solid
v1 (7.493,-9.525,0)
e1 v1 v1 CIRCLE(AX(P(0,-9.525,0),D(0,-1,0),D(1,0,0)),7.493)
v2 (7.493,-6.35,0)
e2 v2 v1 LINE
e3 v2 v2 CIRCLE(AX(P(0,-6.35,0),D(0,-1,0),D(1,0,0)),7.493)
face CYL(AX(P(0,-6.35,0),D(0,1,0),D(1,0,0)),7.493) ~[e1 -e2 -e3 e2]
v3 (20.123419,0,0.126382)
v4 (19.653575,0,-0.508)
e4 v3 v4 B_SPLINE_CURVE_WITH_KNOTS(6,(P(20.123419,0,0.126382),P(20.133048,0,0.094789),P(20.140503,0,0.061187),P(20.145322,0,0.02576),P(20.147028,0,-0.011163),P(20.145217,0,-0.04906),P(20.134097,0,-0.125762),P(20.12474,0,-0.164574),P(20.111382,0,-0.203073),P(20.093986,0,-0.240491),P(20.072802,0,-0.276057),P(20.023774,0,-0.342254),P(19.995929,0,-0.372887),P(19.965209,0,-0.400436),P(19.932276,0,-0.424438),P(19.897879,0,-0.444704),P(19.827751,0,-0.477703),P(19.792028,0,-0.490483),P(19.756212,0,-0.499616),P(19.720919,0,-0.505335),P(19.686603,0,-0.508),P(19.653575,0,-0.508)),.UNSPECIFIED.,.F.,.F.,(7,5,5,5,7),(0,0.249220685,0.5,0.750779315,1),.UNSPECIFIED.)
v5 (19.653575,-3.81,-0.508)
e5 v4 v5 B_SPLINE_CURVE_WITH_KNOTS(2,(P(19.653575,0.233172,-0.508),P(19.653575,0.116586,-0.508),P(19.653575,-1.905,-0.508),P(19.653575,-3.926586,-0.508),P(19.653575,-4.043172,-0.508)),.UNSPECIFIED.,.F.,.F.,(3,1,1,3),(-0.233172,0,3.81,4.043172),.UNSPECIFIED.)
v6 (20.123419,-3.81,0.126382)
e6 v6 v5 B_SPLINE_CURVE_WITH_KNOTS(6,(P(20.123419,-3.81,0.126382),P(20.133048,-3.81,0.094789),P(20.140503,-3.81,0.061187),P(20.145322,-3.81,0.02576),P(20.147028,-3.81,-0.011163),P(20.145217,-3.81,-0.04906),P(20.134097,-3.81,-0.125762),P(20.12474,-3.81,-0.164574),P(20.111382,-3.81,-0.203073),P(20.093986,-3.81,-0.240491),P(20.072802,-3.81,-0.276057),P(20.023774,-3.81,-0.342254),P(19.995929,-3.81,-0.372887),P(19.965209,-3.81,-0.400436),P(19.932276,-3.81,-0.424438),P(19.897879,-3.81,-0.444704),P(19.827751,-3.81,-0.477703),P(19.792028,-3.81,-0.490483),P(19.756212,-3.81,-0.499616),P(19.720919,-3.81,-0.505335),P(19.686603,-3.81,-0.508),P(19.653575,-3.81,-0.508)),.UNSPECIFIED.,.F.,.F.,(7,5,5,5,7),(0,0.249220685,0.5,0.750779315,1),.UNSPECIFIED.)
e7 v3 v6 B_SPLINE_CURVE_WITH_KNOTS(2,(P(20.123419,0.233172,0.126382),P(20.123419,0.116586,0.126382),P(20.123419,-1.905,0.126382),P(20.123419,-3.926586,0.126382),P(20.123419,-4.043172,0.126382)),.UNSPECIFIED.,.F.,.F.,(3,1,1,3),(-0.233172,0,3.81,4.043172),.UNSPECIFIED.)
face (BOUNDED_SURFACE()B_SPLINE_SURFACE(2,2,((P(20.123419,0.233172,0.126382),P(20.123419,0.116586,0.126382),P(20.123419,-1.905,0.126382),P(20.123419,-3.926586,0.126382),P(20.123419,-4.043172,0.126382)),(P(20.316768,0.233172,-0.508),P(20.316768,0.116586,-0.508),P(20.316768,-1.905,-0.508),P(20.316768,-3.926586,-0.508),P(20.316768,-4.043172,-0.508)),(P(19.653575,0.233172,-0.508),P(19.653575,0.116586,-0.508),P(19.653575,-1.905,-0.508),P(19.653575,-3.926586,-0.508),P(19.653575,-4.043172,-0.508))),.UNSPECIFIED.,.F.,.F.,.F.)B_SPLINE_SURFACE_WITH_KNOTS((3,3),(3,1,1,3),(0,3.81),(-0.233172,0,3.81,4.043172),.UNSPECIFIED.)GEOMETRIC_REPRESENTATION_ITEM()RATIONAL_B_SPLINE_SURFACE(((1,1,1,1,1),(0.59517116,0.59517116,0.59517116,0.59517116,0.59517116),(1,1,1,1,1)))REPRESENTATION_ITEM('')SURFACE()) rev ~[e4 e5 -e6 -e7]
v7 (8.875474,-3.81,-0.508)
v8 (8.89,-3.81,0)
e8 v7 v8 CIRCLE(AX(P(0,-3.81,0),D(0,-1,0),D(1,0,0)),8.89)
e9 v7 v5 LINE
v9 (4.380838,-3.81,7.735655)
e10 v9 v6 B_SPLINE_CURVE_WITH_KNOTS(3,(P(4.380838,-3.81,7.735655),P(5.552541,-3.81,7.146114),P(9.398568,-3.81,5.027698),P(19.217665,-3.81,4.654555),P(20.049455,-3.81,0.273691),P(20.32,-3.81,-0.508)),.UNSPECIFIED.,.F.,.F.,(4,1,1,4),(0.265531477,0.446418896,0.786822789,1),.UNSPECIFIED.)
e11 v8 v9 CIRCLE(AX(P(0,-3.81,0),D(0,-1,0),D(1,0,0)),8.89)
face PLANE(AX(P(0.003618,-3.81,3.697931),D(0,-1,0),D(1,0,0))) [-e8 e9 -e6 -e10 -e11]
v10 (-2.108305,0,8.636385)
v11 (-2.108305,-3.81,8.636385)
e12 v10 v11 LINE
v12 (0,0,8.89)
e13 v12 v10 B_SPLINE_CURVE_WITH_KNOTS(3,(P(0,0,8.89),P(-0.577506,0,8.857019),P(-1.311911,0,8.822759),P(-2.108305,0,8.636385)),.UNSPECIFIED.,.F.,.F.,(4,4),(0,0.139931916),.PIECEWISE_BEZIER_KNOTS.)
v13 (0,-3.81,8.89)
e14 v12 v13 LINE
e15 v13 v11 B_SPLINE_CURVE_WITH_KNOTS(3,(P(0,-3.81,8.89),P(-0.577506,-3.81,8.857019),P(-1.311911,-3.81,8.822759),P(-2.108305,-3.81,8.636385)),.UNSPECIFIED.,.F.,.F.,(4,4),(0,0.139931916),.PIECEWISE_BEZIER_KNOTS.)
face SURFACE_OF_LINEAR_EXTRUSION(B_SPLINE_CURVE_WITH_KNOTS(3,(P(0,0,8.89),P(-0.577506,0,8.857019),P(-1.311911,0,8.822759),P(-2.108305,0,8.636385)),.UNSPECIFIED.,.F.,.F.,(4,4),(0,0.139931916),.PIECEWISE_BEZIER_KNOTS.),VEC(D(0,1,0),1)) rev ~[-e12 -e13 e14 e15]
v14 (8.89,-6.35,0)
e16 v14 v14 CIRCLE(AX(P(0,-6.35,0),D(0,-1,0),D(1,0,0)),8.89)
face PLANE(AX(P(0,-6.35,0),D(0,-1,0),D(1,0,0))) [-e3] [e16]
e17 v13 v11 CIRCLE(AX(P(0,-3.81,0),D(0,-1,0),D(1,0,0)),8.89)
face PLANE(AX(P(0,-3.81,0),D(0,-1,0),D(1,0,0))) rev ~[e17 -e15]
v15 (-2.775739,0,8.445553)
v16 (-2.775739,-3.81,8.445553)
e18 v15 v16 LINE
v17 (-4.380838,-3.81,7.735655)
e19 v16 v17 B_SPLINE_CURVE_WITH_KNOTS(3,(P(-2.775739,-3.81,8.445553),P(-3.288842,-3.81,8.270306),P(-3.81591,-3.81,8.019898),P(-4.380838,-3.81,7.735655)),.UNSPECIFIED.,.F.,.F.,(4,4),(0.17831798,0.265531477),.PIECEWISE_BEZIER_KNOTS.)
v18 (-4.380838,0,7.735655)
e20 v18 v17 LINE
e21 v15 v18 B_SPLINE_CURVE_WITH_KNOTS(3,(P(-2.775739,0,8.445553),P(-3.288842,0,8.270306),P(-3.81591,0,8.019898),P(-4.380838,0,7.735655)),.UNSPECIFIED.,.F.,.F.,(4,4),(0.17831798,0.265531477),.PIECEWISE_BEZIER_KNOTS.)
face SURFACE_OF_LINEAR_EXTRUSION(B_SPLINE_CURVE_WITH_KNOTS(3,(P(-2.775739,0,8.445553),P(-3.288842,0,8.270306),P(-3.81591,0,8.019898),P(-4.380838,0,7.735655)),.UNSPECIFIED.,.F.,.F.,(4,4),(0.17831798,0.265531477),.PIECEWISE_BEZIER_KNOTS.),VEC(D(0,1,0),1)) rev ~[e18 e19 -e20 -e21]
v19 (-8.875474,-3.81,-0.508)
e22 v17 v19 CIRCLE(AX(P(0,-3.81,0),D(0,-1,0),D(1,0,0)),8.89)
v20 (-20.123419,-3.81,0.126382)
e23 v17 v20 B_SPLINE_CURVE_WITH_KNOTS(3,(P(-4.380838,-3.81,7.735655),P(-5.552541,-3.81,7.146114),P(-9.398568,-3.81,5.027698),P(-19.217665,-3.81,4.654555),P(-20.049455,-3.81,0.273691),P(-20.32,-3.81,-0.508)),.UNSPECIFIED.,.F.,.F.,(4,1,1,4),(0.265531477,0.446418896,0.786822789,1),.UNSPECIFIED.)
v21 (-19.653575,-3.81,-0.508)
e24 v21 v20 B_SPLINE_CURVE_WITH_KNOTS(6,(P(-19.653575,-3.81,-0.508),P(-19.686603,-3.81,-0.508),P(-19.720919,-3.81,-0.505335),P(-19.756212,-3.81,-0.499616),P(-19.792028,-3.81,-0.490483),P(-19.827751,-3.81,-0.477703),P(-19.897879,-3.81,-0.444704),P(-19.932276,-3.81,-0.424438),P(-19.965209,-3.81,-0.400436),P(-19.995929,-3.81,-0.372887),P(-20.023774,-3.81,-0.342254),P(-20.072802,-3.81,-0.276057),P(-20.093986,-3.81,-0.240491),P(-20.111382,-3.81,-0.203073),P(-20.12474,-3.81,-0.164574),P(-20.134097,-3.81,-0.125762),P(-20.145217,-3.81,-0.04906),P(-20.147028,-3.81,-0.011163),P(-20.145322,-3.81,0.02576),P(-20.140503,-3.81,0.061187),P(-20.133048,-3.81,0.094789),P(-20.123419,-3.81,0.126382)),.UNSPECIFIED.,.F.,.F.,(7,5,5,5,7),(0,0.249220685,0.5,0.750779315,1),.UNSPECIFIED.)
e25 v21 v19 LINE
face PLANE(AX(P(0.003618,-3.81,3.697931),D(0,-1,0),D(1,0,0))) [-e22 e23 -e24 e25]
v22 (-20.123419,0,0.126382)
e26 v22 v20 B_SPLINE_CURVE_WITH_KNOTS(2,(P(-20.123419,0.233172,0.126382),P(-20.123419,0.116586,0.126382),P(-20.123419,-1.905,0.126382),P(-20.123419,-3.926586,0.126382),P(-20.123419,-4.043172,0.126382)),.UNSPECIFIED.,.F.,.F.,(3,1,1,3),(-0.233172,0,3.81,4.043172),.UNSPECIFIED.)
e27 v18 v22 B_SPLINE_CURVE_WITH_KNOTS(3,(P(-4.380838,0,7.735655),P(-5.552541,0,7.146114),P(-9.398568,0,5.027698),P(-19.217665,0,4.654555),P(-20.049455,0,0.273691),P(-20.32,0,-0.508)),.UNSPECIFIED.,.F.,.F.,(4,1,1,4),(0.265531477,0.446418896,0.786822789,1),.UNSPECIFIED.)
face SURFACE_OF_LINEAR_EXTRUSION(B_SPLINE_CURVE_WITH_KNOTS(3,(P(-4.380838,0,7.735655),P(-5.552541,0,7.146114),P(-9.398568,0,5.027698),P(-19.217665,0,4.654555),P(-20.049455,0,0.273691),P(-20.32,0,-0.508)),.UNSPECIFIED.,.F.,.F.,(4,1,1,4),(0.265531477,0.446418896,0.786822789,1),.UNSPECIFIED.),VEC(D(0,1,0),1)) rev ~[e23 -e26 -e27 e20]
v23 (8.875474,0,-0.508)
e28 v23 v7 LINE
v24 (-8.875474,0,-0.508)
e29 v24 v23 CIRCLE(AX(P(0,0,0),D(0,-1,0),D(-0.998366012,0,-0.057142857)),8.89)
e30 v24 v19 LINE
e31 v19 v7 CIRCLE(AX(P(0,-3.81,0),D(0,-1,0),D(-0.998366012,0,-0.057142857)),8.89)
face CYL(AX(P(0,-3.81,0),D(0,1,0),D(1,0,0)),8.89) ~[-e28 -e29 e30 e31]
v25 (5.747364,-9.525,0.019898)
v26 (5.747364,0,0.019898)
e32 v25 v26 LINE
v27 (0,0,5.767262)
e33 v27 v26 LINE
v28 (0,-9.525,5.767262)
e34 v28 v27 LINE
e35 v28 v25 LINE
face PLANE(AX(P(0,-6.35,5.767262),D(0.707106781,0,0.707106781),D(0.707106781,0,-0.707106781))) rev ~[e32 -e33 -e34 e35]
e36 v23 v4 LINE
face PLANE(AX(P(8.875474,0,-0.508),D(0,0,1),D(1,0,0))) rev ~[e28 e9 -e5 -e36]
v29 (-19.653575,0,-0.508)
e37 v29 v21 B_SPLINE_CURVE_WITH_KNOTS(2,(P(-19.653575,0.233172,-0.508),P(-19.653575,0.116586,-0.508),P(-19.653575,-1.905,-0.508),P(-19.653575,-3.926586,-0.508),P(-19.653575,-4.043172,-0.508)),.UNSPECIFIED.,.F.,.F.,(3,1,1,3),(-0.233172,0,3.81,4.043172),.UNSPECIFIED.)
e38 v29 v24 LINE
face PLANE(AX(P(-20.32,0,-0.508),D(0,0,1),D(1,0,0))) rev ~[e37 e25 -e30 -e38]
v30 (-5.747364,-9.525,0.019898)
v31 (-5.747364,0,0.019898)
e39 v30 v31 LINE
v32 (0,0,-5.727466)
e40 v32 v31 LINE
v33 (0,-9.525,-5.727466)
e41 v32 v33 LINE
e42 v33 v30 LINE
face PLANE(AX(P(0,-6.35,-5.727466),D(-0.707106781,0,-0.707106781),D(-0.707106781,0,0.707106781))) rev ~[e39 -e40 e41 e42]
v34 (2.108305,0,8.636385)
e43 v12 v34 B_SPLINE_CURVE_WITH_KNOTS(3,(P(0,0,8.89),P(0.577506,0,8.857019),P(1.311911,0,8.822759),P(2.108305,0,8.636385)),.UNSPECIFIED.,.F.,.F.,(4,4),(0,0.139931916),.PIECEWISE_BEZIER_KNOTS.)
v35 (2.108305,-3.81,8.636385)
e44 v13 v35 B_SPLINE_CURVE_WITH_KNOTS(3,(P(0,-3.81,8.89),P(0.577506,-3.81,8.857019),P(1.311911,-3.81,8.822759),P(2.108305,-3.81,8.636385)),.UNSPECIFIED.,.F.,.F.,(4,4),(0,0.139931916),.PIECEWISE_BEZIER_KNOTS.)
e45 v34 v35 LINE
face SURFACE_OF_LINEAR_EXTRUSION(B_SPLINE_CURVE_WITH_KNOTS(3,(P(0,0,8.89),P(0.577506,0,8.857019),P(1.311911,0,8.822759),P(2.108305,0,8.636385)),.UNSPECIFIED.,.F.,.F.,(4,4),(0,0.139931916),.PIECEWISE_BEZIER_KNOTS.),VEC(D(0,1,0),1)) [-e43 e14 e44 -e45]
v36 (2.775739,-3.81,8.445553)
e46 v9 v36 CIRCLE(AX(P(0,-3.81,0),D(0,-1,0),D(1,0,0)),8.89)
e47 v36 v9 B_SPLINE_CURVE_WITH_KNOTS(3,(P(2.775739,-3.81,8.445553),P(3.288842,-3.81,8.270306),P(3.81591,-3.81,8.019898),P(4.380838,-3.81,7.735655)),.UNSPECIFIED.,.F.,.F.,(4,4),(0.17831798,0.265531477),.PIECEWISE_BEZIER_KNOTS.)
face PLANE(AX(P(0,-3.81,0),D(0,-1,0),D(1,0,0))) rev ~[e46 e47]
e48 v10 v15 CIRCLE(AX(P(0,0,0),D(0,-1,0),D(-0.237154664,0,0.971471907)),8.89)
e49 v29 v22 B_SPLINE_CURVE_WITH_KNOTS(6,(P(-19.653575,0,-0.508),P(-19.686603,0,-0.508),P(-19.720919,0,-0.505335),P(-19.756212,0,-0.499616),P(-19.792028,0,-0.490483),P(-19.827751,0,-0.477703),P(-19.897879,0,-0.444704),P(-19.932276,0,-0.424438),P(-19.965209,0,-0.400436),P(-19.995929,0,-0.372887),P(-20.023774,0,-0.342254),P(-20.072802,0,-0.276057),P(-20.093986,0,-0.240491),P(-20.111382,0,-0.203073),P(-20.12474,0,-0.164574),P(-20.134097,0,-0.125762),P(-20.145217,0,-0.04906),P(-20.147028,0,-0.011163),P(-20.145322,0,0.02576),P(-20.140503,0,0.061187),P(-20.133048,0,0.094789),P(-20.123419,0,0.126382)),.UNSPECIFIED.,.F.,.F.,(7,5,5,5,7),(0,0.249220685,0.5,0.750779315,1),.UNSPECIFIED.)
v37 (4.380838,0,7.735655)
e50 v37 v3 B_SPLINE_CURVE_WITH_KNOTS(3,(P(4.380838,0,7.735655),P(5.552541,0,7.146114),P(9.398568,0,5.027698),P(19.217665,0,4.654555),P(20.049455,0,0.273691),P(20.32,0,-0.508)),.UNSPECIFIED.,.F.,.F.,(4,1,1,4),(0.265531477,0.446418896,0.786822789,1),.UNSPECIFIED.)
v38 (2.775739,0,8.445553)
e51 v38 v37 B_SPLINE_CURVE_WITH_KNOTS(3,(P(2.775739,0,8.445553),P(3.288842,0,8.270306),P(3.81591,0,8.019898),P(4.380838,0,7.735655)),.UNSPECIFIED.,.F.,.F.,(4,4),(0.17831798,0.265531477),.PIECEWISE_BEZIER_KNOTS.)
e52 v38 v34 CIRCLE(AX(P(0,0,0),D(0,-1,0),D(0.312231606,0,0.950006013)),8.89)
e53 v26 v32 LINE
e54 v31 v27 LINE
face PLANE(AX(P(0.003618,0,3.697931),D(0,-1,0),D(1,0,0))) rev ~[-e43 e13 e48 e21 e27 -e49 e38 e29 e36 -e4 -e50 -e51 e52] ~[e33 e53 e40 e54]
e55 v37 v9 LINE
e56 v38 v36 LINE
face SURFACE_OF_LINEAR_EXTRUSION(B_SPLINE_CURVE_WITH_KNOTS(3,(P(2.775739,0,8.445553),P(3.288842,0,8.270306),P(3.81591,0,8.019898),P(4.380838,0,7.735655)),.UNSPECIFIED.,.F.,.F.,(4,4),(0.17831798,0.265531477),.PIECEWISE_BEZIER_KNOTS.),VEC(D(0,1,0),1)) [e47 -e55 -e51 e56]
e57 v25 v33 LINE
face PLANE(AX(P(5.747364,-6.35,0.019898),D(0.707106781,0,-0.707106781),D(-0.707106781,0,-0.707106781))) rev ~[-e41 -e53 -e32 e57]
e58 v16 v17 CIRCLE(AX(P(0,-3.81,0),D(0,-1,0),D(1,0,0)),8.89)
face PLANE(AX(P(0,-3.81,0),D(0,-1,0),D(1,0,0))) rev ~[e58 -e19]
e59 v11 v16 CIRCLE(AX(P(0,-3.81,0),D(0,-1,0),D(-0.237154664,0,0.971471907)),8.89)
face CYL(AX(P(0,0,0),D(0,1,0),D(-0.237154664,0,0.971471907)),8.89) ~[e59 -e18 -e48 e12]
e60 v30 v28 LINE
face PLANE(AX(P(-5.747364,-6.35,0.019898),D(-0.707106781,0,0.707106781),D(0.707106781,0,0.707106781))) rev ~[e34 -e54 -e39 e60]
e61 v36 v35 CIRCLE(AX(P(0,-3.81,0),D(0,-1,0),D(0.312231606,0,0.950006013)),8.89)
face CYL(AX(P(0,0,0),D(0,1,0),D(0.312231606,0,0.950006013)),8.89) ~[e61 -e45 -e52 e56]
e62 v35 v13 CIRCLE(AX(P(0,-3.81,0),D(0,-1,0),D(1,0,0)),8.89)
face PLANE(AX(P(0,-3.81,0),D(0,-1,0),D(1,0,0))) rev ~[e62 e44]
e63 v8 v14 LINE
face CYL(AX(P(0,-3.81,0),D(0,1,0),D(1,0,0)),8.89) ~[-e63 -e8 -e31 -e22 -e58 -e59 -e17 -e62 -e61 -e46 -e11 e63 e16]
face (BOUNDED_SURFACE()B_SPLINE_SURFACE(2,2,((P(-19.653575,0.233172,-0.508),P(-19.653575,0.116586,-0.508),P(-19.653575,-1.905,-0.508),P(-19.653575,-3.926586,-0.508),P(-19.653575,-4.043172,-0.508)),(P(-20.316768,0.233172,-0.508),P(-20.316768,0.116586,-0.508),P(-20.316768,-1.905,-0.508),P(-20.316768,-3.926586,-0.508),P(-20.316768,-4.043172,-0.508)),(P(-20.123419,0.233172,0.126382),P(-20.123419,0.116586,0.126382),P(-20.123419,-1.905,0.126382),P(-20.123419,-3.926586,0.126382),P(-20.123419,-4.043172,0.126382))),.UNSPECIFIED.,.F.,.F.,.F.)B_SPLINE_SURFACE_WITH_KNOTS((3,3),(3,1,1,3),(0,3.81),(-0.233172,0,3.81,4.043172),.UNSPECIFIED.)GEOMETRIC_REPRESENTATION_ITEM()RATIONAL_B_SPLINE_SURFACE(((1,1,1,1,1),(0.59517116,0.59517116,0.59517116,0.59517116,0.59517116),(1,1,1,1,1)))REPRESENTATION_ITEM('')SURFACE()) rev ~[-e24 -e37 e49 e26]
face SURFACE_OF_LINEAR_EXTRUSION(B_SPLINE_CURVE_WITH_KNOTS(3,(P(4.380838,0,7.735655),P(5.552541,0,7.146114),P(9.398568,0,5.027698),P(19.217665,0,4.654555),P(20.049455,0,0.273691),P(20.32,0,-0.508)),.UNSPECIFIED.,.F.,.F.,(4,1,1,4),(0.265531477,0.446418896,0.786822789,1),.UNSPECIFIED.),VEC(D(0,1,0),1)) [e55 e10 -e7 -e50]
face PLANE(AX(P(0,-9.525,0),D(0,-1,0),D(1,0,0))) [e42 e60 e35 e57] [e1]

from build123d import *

# Parameters (mm, degrees)
F1_DEPTH = 3.81
F2_R     = 8.89
F3_DEPTH = 2.54
F4_R     = 7.493
F5_DEPTH = 3.175
F6_R     = 0.4911819864


with BuildPart() as f1:
    # F0 (on Front) → F1 (new body)
    with BuildSketch(Plane.XZ):
        with BuildLine():
            ThreePointArc((8.8754738465, -0.508), (8.8863677196, -0.2541038219), (8.89, 0))
            ThreePointArc((8.89, 0), (7.6804215502, 4.4769660275), (4.3808380628, 7.7356549734))
            add(Edge.make_bspline(
                [(2.7757389763, 8.4455534535), (3.2888417453, 8.2703062234), (3.8159102337, 8.0198976132), (4.3808380628, 7.7356549734)],
                knots=[0.1783179795, 0.1783179795, 0.1783179795, 0.1783179795, 0.2655314771, 0.2655314771, 0.2655314771, 0.2655314771], degree=3))
            ThreePointArc((2.7757389763, 8.4455534535), (2.4438853282, 8.5474864435), (2.1083049646, 8.6363852494))
            add(Edge.make_bspline(
                [(0, 8.89), (0.577506035, 8.8570186599), (1.3119112895, 8.8227589155), (2.1083049646, 8.6363852494)],
                knots=[0, 0, 0, 0, 0.1399319156, 0.1399319156, 0.1399319156, 0.1399319156], degree=3))
            add(Edge.make_bspline(
                [(0, 8.89), (-0.577506035, 8.8570186599), (-1.3119112895, 8.8227589155), (-2.1083049646, 8.6363852494)],
                knots=[0, 0, 0, 0, 0.1399319156, 0.1399319156, 0.1399319156, 0.1399319156], degree=3))
            ThreePointArc((-2.1083049646, 8.6363852494), (-2.4438853282, 8.5474864435), (-2.7757389763, 8.4455534535))
            add(Edge.make_bspline(
                [(-2.7757389763, 8.4455534535), (-3.2888417453, 8.2703062234), (-3.8159102337, 8.0198976132), (-4.3808380628, 7.7356549734)],
                knots=[0.1783179795, 0.1783179795, 0.1783179795, 0.1783179795, 0.2655314771, 0.2655314771, 0.2655314771, 0.2655314771], degree=3))
            ThreePointArc((-4.3808380628, 7.7356549734), (-7.8052490793, 4.255606515), (-8.8754738465, -0.508))
            Line((-8.8754738465, -0.508), (-5.2194662387, -0.508))
            Line((-5.2194662387, -0.508), (-5.7473639175, 0.0198976788))
            Line((-5.7473639175, 0.0198976788), (0, 5.7672615963))
            Line((0, 5.7672615963), (5.7473639175, 0.0198976788))
            Line((5.7473639175, 0.0198976788), (5.2194662387, -0.508))
            Line((5.2194662387, -0.508), (8.8754738465, -0.508))
        make_face()
        with BuildLine():
            ThreePointArc((4.3808380628, 7.7356549734), (7.6804215502, 4.4769660275), (8.89, 0))
            ThreePointArc((8.89, 0), (8.8863677196, -0.2541038219), (8.8754738465, -0.508))
            Line((8.8754738465, -0.508), (20.32, -0.508))
            add(Edge.make_bspline(
                [(4.3808380628, 7.7356549734), (5.5525412949, 7.1461141461), (9.398567587, 5.0276978273), (19.2176653381, 4.6545545686), (20.0494547253, 0.2736910266), (20.32, -0.508)],
                knots=[0.2655314771, 0.2655314771, 0.2655314771, 0.2655314771, 0.4464188962, 0.7868227895, 1, 1, 1, 1], degree=3))
        make_face()
        with BuildLine():
            ThreePointArc((-8.8754738465, -0.508), (0, -8.89), (8.8754738465, -0.508))
            Line((8.8754738465, -0.508), (5.2194662387, -0.508))
            Line((5.2194662387, -0.508), (0, -5.7274662387))
            Line((0, -5.7274662387), (-5.2194662387, -0.508))
            Line((-5.2194662387, -0.508), (-8.8754738465, -0.508))
        make_face()
        with BuildLine():
            Line((-20.32, -0.508), (-8.8754738465, -0.508))
            ThreePointArc((-8.8754738465, -0.508), (-7.8052490793, 4.255606515), (-4.3808380628, 7.7356549734))
            add(Edge.make_bspline(
                [(-4.3808380628, 7.7356549734), (-5.5525412949, 7.1461141461), (-9.398567587, 5.0276978273), (-19.2176653381, 4.6545545686), (-20.0494547253, 0.2736910266), (-20.32, -0.508)],
                knots=[0.2655314771, 0.2655314771, 0.2655314771, 0.2655314771, 0.4464188962, 0.7868227895, 1, 1, 1, 1], degree=3))
        make_face()
    extrude(amount=F1_DEPTH)

    # F2 (on face) → F3 (join)
    with BuildSketch(Plane.XZ.offset(3.81)):
        Circle(F2_R)
        Polygon((-5.7473639175, 0.0198976788), (0, 5.7672615963), (5.7473639175, 0.0198976788), (0, -5.7274662387), align=None, mode=Mode.SUBTRACT)
    extrude(amount=F3_DEPTH)

    # F4 (on face) → F5 (join)
    with BuildSketch(Plane.XZ.offset(6.35)):
        Circle(F4_R)
        Polygon((0, -5.7274662387), (-5.7473639175, 0.0198976788), (0, 5.7672615963), (5.7473639175, 0.0198976788), align=None, mode=Mode.SUBTRACT)
    extrude(amount=F5_DEPTH)

    # F6
    f6_edges = [f1.edges().sort_by_distance(p)[0] for p in [
        (20.32, -1.905, -0.508),
        (-20.32, -1.905, -0.508),
    ]]
    fillet(f6_edges, radius=F6_R)


solid = f1.part
